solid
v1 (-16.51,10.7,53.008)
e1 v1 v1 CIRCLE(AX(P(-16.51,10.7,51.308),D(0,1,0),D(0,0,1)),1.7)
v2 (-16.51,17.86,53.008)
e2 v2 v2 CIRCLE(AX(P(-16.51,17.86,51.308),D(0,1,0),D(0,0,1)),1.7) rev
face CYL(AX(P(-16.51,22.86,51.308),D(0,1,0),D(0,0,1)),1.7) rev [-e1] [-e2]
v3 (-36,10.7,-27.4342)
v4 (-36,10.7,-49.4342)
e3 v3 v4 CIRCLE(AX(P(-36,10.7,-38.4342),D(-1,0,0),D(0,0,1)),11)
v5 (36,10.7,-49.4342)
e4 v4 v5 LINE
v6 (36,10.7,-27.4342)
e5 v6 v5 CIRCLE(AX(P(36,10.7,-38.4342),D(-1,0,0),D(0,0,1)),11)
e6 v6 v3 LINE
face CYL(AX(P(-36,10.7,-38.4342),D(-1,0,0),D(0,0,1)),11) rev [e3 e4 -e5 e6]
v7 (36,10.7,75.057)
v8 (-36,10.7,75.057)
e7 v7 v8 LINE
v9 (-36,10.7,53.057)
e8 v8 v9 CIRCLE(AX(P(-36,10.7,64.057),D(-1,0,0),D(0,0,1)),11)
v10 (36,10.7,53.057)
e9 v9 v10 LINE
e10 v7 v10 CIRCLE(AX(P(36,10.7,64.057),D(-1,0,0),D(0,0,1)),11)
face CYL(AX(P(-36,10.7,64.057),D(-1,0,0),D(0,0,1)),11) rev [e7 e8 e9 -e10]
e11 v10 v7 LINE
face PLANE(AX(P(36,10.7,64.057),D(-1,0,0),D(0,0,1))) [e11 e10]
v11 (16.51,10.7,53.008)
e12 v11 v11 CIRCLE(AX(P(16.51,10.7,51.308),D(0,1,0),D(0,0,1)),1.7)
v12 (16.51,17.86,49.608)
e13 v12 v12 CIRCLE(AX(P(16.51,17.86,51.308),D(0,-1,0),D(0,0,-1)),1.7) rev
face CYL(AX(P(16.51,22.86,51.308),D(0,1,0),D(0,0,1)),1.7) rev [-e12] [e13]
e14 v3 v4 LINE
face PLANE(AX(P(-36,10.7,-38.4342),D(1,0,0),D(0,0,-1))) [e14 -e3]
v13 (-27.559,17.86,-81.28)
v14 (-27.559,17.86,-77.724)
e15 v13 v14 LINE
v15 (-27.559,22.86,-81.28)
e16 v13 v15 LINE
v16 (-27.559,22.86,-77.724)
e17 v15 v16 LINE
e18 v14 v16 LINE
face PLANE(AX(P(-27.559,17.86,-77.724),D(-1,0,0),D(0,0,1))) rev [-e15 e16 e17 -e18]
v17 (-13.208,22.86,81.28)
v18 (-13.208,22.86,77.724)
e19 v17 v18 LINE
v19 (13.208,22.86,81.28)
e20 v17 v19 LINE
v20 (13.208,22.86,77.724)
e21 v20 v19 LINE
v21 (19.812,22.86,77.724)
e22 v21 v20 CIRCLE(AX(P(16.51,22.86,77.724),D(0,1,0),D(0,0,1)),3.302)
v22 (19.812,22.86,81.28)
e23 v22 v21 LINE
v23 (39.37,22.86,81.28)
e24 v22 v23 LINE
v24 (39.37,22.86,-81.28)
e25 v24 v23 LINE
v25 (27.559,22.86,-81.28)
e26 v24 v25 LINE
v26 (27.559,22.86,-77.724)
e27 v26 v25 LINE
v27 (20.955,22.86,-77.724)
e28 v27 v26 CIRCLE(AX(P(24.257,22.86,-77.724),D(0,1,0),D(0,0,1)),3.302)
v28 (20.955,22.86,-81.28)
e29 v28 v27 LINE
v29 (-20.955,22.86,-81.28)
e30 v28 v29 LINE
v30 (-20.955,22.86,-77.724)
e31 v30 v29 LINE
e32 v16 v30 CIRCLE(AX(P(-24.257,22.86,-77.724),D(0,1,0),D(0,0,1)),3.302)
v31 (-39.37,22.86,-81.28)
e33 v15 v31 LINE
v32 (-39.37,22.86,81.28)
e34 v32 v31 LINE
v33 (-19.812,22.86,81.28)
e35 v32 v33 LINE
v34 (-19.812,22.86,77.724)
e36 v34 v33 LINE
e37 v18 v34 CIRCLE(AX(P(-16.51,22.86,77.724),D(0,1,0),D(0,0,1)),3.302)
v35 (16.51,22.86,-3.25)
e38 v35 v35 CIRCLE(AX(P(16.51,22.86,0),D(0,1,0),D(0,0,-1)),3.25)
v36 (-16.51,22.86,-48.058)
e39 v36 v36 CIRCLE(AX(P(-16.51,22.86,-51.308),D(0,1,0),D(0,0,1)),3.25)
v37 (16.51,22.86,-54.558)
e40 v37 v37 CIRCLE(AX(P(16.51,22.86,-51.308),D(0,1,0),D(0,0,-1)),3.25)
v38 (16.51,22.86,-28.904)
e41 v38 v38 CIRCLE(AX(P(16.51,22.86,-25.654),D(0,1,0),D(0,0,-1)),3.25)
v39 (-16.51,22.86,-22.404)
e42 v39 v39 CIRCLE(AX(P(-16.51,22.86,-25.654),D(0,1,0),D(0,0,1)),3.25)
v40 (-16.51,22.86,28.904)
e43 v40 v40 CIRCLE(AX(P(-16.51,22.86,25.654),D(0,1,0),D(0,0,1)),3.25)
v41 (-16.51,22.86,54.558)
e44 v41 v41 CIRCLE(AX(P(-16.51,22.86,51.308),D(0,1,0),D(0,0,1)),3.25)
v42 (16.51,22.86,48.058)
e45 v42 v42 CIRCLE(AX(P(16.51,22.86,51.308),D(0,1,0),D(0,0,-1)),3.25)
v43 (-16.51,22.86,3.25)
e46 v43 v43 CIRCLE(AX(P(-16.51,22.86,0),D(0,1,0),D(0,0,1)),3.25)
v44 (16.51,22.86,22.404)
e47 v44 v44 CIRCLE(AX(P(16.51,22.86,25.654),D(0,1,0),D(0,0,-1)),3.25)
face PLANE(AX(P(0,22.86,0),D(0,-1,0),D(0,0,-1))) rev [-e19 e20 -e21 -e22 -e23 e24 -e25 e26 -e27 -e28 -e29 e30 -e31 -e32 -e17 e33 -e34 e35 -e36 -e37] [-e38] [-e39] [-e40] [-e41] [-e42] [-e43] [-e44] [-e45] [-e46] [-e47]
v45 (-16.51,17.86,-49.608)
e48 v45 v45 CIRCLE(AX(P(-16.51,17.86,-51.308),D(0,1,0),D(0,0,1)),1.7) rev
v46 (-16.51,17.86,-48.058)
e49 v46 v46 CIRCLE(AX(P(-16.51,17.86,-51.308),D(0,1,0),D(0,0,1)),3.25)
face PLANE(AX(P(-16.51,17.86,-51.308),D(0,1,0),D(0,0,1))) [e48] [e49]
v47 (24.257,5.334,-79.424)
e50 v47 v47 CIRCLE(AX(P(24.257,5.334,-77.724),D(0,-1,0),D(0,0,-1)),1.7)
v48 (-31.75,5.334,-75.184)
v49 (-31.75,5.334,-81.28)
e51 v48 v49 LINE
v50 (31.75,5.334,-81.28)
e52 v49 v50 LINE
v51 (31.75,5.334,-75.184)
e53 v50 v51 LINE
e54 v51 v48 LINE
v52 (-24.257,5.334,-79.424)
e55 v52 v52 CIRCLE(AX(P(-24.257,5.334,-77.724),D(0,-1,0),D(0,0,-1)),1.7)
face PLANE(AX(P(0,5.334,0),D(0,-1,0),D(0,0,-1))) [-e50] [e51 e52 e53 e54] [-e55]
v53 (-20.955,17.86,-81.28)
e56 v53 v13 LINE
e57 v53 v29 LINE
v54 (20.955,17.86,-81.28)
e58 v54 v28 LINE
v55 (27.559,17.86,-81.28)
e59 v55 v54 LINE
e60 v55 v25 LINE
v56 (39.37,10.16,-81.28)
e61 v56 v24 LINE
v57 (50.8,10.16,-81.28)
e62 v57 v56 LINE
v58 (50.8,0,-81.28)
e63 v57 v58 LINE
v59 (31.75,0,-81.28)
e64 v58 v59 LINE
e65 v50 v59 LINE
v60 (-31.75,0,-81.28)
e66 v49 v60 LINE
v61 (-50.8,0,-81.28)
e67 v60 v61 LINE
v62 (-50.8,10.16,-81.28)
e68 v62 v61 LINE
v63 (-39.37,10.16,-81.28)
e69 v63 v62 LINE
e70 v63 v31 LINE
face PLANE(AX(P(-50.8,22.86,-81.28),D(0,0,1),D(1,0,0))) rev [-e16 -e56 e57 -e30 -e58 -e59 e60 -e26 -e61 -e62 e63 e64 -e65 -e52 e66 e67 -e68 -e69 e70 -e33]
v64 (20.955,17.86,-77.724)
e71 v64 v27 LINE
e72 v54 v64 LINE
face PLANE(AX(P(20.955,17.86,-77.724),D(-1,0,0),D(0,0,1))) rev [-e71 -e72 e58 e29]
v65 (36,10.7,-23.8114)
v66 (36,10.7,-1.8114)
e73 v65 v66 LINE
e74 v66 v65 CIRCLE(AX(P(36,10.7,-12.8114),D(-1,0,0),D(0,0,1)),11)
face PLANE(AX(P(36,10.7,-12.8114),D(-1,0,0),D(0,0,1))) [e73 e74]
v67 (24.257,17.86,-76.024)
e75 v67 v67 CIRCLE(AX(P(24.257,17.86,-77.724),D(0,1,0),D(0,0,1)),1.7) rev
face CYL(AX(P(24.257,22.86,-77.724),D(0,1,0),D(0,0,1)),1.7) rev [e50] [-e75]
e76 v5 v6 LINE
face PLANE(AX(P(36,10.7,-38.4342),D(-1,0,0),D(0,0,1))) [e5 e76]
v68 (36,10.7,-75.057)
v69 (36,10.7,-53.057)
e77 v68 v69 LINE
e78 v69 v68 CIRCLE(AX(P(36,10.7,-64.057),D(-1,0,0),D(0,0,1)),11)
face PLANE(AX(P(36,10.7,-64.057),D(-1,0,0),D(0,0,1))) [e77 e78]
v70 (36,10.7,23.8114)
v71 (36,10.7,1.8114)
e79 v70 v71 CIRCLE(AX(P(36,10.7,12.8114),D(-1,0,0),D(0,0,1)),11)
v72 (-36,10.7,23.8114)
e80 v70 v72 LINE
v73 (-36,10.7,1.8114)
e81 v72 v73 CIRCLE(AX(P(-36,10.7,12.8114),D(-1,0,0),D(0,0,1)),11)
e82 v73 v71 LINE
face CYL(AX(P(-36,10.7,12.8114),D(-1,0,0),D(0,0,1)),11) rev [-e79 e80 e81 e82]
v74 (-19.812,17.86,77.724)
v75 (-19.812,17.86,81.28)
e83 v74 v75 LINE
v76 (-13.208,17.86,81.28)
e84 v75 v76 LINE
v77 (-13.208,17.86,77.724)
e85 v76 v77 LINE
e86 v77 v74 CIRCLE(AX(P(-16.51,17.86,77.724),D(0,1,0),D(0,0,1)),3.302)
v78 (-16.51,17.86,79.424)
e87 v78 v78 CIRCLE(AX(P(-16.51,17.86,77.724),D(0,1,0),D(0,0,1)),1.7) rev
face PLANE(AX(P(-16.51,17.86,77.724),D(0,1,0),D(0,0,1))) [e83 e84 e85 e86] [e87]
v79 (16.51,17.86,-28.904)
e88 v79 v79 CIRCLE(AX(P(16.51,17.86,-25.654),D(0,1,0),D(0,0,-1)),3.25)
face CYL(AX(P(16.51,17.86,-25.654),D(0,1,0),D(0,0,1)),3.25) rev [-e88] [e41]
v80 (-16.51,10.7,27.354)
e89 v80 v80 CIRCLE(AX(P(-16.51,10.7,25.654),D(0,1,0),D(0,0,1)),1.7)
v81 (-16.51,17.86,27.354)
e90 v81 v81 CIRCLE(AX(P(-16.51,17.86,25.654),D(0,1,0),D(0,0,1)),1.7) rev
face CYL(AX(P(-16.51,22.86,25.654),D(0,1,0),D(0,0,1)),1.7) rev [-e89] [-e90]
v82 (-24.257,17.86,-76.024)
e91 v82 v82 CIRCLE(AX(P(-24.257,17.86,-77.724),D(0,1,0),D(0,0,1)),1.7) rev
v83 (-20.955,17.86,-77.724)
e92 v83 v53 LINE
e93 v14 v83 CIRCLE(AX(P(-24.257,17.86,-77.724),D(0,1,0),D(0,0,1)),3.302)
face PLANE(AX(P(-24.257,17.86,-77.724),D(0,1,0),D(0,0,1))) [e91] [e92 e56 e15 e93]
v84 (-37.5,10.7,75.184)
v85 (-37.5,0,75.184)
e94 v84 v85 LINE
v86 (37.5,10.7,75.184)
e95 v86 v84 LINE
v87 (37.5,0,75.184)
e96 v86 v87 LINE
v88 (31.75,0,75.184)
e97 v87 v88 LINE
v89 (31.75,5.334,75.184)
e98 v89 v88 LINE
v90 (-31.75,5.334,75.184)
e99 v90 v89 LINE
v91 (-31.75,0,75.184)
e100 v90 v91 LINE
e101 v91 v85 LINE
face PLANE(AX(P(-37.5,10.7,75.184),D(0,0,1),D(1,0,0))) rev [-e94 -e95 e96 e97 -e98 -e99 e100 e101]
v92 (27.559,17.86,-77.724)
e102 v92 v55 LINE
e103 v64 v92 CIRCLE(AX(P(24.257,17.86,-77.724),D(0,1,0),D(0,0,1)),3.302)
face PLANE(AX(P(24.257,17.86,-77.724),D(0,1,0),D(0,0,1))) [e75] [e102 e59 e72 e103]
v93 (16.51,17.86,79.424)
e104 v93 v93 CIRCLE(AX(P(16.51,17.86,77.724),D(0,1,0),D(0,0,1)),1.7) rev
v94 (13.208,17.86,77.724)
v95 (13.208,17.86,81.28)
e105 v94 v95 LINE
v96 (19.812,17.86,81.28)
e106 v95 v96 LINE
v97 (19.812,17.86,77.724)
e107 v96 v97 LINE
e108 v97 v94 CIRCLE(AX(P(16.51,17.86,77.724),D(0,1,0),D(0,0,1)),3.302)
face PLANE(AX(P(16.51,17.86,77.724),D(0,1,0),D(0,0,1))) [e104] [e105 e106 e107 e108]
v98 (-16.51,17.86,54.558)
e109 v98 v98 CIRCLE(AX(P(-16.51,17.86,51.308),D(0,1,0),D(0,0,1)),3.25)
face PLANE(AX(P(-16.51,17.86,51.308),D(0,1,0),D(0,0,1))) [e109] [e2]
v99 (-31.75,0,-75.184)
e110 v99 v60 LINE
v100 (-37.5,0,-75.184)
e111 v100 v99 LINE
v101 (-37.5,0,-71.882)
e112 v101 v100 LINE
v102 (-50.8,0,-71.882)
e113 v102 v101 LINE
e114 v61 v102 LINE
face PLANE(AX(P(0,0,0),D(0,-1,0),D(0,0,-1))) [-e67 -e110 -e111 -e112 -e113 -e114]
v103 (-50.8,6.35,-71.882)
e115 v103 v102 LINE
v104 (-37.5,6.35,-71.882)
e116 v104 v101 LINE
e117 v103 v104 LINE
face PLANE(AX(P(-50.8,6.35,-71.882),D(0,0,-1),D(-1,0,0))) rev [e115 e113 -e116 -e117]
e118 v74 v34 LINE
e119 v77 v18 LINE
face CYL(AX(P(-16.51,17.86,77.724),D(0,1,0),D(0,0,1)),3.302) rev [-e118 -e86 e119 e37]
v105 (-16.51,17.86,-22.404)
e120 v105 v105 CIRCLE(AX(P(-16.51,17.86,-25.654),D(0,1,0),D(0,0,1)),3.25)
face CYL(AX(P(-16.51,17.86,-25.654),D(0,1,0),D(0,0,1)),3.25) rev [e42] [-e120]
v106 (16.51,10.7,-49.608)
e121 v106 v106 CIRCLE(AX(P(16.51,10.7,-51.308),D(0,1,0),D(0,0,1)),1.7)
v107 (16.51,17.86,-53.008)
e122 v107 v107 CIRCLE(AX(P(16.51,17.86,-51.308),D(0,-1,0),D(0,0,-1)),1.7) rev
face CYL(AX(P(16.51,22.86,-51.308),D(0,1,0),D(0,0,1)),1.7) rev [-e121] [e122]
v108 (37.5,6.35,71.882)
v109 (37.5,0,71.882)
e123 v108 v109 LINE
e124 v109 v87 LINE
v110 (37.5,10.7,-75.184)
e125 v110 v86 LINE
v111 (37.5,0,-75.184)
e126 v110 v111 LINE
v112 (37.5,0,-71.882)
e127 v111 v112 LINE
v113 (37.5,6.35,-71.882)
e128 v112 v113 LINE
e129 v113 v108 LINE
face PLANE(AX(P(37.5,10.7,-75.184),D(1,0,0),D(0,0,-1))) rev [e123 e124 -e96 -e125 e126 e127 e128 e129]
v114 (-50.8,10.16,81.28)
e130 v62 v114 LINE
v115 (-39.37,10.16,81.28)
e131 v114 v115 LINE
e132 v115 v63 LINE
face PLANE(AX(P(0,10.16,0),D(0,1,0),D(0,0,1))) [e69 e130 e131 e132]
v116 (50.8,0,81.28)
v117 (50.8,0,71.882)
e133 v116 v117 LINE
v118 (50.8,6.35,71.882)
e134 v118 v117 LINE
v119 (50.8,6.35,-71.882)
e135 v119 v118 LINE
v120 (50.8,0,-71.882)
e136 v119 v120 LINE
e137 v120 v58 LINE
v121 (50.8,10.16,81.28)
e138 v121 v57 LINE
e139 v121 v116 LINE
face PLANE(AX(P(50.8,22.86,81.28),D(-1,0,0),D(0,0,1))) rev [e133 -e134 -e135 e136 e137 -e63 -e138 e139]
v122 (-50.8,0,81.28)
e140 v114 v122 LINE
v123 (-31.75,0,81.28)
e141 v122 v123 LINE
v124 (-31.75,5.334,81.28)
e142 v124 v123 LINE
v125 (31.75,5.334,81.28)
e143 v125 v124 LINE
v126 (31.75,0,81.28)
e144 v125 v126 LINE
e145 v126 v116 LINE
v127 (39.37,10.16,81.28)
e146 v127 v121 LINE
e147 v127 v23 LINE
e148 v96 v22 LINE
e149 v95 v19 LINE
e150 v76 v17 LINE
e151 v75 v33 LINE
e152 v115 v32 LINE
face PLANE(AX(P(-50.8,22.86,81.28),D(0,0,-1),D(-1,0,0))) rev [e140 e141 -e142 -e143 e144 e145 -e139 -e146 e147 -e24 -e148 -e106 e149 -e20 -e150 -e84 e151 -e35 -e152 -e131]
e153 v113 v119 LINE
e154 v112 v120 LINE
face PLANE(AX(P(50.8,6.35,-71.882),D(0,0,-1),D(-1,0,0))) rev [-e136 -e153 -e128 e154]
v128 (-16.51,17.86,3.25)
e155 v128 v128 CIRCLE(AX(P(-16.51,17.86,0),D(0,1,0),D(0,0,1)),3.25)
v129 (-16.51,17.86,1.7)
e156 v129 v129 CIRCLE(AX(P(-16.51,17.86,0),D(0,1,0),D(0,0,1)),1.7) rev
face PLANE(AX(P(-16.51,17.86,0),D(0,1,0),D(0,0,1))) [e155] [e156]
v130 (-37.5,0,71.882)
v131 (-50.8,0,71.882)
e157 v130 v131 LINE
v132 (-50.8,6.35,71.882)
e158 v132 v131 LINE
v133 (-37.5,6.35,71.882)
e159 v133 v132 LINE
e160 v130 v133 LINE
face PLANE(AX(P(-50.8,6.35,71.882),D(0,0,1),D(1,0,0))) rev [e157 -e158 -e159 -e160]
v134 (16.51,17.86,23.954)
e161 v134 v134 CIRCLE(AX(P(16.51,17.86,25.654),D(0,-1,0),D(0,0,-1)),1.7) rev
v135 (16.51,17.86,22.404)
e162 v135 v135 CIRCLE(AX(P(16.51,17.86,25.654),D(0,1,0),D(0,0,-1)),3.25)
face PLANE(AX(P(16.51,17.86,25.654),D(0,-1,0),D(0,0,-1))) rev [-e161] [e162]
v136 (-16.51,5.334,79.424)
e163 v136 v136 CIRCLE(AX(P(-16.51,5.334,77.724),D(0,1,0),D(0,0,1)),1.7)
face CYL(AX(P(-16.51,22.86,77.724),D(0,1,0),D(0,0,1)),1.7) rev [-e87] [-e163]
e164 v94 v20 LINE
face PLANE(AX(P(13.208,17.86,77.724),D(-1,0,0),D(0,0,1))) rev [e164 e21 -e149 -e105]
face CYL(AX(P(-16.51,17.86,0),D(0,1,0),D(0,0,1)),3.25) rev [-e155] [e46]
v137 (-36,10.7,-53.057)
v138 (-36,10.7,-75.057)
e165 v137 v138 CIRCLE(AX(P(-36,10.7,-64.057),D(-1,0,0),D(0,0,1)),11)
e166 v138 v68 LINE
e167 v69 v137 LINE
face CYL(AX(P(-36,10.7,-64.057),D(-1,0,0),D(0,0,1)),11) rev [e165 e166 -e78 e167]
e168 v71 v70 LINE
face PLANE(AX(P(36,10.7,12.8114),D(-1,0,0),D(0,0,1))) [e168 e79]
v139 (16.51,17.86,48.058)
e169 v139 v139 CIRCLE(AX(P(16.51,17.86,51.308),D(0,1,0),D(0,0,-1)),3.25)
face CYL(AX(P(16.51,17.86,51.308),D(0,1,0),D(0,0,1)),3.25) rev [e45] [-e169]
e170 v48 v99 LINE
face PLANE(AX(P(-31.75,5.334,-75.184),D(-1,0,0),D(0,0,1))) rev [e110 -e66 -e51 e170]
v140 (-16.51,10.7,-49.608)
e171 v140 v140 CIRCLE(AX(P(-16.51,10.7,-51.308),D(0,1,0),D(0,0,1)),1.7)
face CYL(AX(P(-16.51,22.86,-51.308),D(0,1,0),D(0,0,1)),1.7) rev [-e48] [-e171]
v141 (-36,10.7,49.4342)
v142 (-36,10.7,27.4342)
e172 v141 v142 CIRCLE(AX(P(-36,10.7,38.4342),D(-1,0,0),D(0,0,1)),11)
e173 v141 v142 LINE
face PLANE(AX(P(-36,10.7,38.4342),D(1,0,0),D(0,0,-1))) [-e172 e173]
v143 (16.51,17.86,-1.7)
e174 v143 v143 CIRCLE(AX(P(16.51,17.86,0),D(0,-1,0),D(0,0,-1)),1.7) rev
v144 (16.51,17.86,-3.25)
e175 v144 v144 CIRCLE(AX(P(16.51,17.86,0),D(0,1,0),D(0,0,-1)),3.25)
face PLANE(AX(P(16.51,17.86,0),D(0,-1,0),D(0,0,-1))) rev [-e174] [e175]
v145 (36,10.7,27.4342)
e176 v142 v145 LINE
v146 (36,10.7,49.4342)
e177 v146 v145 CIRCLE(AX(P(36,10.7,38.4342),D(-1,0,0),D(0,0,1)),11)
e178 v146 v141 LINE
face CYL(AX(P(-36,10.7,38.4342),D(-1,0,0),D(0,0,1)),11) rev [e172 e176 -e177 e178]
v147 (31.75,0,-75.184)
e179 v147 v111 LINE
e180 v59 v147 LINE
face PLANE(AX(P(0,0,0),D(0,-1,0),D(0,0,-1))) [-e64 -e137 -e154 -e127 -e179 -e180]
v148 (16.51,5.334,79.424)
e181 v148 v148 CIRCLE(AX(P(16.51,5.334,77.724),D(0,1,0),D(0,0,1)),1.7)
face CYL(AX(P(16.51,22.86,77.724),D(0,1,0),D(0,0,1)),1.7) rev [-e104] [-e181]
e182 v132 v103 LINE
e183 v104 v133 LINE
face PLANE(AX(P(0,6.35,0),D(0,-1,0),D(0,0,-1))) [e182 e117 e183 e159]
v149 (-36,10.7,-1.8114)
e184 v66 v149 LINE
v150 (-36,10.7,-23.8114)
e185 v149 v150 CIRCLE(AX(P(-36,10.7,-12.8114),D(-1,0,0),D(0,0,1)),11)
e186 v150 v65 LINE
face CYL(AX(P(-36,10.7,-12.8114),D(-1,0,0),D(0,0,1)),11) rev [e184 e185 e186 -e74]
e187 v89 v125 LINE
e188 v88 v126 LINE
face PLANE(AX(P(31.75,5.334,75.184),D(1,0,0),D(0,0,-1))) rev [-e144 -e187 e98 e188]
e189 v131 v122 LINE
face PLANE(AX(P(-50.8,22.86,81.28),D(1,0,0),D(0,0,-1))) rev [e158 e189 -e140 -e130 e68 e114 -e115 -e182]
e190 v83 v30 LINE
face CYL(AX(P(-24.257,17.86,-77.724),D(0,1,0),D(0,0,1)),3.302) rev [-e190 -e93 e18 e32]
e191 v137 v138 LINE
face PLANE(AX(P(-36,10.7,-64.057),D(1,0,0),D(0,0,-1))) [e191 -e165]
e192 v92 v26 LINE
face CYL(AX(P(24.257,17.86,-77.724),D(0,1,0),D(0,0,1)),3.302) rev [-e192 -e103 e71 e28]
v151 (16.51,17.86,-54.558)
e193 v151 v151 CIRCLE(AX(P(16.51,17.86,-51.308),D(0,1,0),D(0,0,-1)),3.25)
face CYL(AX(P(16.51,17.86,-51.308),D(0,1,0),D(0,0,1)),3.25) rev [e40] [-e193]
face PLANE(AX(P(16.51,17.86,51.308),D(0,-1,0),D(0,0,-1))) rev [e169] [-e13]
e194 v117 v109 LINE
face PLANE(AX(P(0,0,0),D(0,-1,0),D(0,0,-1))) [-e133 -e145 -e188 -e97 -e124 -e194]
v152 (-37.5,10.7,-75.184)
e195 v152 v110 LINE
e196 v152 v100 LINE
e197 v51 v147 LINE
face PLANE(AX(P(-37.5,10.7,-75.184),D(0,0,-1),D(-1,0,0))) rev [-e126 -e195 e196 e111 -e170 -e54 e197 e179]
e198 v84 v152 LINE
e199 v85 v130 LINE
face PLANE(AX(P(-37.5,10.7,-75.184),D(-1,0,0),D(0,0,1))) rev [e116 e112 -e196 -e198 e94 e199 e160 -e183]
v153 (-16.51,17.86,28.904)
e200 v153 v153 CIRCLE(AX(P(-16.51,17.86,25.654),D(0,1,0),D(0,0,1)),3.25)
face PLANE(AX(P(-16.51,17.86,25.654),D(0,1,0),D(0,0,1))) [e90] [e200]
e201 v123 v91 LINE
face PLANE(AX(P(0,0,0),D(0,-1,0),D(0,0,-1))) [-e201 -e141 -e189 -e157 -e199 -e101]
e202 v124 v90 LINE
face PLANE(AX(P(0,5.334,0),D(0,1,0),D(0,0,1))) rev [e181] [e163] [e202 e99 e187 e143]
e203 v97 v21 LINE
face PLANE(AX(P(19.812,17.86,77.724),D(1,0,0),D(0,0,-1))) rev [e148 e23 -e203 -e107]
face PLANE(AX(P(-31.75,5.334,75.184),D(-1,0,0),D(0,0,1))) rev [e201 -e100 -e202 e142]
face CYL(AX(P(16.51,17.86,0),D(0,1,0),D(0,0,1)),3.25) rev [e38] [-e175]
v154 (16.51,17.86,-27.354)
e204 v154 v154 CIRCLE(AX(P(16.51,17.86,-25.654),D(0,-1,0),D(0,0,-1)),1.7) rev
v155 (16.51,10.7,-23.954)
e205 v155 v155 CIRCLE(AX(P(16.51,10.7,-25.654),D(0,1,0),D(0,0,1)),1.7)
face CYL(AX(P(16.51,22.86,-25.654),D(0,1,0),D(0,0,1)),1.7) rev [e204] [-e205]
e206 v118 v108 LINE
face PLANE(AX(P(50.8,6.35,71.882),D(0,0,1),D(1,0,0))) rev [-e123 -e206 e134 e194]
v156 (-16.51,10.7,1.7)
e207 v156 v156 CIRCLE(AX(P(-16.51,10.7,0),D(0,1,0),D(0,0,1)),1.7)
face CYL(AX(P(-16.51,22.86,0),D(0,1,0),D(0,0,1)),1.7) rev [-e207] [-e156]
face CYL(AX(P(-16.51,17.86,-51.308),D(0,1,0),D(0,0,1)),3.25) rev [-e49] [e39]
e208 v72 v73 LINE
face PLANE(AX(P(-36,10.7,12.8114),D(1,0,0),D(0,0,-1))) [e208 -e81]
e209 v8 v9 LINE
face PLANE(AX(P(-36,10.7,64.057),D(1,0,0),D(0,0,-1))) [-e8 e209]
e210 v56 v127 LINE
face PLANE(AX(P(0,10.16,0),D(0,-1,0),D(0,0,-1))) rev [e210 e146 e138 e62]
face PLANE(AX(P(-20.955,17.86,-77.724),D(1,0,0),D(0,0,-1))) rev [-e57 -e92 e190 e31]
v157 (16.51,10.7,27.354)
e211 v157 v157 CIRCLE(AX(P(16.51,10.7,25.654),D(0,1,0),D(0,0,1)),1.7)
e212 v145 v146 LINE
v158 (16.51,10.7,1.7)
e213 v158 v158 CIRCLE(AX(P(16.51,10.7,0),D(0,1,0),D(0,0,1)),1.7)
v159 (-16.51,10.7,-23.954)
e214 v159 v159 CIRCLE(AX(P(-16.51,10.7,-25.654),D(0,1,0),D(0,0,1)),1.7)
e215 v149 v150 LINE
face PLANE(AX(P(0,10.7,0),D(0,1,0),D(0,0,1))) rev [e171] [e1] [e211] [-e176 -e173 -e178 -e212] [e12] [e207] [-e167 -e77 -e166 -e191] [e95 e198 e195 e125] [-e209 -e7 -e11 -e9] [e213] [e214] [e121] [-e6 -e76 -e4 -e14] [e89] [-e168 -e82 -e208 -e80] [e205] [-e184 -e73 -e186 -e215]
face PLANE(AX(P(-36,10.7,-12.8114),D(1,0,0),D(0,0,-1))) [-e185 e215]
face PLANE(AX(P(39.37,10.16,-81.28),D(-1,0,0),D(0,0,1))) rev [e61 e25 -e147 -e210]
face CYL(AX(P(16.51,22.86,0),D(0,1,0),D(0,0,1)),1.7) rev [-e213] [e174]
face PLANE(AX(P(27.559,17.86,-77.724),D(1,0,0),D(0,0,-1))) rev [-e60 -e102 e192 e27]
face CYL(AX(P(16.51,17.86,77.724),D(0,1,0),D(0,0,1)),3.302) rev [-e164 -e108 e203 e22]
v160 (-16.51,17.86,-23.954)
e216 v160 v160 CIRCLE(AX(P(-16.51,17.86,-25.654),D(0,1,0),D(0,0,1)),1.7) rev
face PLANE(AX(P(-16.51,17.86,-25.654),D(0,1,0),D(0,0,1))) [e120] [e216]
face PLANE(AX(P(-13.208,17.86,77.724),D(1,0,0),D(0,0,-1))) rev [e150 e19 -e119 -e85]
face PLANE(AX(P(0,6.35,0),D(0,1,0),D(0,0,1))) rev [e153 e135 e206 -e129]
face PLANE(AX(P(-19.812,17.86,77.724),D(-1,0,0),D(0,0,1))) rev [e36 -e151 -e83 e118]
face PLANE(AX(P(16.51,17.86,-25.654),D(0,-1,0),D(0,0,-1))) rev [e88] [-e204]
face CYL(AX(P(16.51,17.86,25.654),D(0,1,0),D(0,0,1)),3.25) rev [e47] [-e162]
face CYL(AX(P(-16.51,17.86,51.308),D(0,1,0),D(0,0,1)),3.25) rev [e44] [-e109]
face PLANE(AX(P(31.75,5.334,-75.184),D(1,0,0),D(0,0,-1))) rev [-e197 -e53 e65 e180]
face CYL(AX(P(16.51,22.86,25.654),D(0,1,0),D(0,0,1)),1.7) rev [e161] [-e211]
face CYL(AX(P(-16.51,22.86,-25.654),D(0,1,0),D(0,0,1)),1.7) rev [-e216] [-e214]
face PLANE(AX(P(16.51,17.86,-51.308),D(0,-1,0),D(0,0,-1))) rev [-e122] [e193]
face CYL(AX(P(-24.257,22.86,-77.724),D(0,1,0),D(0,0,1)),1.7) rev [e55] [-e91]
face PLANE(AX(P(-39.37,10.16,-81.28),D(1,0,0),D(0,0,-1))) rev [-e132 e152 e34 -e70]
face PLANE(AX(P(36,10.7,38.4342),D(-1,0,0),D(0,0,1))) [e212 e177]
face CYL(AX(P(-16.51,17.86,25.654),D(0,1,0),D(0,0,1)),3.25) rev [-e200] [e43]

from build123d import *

# Parameters (mm, degrees)
SKETCH1_W                    = 101.6
SKETCH1_H                    = 162.56
BOSS_EXTRUDE1_DEPTH          = 22.86
SKETCH2_W                    = 75
SKETCH2_H                    = 150.368
CUT_EXTRUDE1_DEPTH           = 10.7
SKETCH3_W                    = 72
SKETCH3_H                    = 11.000000098
LPATTERN1_COUNT              = 6
LPATTERN1_PITCH              = 25.622799961
M3_CLEARANCE_HOLE1_D         = 3.4
SKETCH10_R                   = 3.249999977
CUT_EXTRUDE2_DEPTH           = 5
SKETCH11_W                   = 11.43
SKETCH11_H                   = 162.56
CUT_EXTRUDE3_DEPTH           = 12.7
SKETCH12_W                   = 15.748
SKETCH12_H                   = 143.764
CUT_EXTRUDE4_DEPTH           = 6.35
SKETCH17_W                   = 63.5
SKETCH17_H                   = 6.096
CUT_EXTRUDE6_DEPTH           = 5.334
M3_START                     = 5.334
M3_CLEARANCE_HOLE2_OUTLINE_R = 1.7
M3_CLEARANCE_HOLE2_DEPTH     = 17.526
CUT_EXTRUDE8_DEPTH           = 5


# Read off the part's stored shape, not the designer's step: M3 Clearance Hole2
with BuildPart() as part:
    # Sketch1 → Boss-Extrude1 (new body)
    with BuildSketch(Plane(origin=(0, 0, 0), x_dir=(1, 0, 0), z_dir=(0, 1, 0))):
        Rectangle(SKETCH1_W, SKETCH1_H)
    extrude(amount=BOSS_EXTRUDE1_DEPTH)

    # Sketch2 → Cut-Extrude1 (cut)
    with BuildSketch(Plane.XZ):
        Rectangle(SKETCH2_W, SKETCH2_H)
    extrude(amount=-CUT_EXTRUDE1_DEPTH, mode=Mode.SUBTRACT)

    # Sketch3 → Cut-Revolve3 (revolve, cut)
    with BuildSketch(Plane.XZ.offset(-10.7)):
        with Locations((0, 69.556999951)):
            Rectangle(SKETCH3_W, SKETCH3_H)
    cut_revolve3 = revolve(axis=Axis((-36, 10.7, 64.056999902), (1, 0, 0)), mode=Mode.SUBTRACT)

    # LPattern1: Cut-Revolve3 ×6
    with Locations(*[(0, 0, -i * LPATTERN1_PITCH) for i in range(1, LPATTERN1_COUNT)]):
        add(cut_revolve3, mode=Mode.SUBTRACT)

    # M3 Clearance Hole1 (through all)
    with Locations(Plane(origin=(0, 22.86, 0), x_dir=(1, 0, 0), z_dir=(0, 1, 0))):
        with Locations((-16.51, 51.308), (-16.51, 25.654), (-16.51, 0), (-16.51, -25.654), (-16.51, -51.308), (16.51, -51.308), (16.51, -25.654), (16.51, 0), (16.51, 25.654), (16.51, 51.308)):
            Hole(M3_CLEARANCE_HOLE1_D / 2)

    # Sketch10 → Cut-Extrude2 (cut)
    with BuildSketch(Plane(origin=(0, 22.86, 0), x_dir=(1, 0, 0), z_dir=(0, 1, 0))):
        with Locations(Location((-16.51, 51.308, 0), (0, 0, 270))):
            Circle(SKETCH10_R)
        with Locations(Location((-16.51, 25.654, 0), (0, 0, 270))):
            Circle(SKETCH10_R)
        with Locations(Location((-16.51, 0, 0), (0, 0, 270))):
            Circle(SKETCH10_R)
        with Locations(Location((-16.51, -25.654, 0), (0, 0, 270))):
            Circle(SKETCH10_R)
        with Locations(Location((-16.51, -51.308, 0), (0, 0, 270))):
            Circle(SKETCH10_R)
        with Locations(Location((16.51, -51.308, 0), (0, 0, 90))):
            Circle(SKETCH10_R)
        with Locations(Location((16.51, -25.654, 0), (0, 0, 90))):
            Circle(SKETCH10_R)
        with Locations(Location((16.51, 0, 0), (0, 0, 90))):
            Circle(SKETCH10_R)
        with Locations(Location((16.51, 25.654, 0), (0, 0, 90))):
            Circle(SKETCH10_R)
        with Locations(Location((16.51, 51.308, 0), (0, 0, 90))):
            Circle(SKETCH10_R)
    extrude(amount=-CUT_EXTRUDE2_DEPTH, mode=Mode.SUBTRACT)

    # Sketch11 → Cut-Extrude3 (cut)
    with BuildSketch(Plane(origin=(0, 22.86, 0), x_dir=(1, 0, 0), z_dir=(0, 1, 0))):
        with Locations((-45.085, 0)):
            Rectangle(SKETCH11_W, SKETCH11_H)
        with Locations((45.085, 0)):
            Rectangle(SKETCH11_W, SKETCH11_H)
    extrude(amount=-CUT_EXTRUDE3_DEPTH, mode=Mode.SUBTRACT)

    # Sketch12 → Cut-Extrude4 (cut)
    with BuildSketch(Plane.XZ):
        with Locations((-42.926, 0)):
            Rectangle(SKETCH12_W, SKETCH12_H)
        with Locations((42.926, 0)):
            Rectangle(SKETCH12_W, SKETCH12_H)
    extrude(amount=-CUT_EXTRUDE4_DEPTH, mode=Mode.SUBTRACT)

    # Sketch17 → Cut-Extrude6 (cut)
    with BuildSketch(Plane.XZ):
        with Locations((0, -78.232)):
            Rectangle(SKETCH17_W, SKETCH17_H)
        with Locations((0, 78.232)):
            Rectangle(SKETCH17_W, SKETCH17_H)
    extrude(amount=-CUT_EXTRUDE6_DEPTH, mode=Mode.SUBTRACT)

    # M3 Clearance Hole2 outline → M3 Clearance Hole2 (cut)
    with BuildSketch(Plane(origin=(0, 0, 0), x_dir=(1, 0, 0), z_dir=(0, 1, 0)).offset(M3_START)):
        with Locations((16.51, -77.724)):
            Circle(M3_CLEARANCE_HOLE2_OUTLINE_R)
        with Locations((-16.51, -77.724)):
            Circle(M3_CLEARANCE_HOLE2_OUTLINE_R)
        with Locations((24.257, 77.724)):
            Circle(M3_CLEARANCE_HOLE2_OUTLINE_R)
        with Locations((-24.257, 77.724)):
            Circle(M3_CLEARANCE_HOLE2_OUTLINE_R)
    extrude(amount=M3_CLEARANCE_HOLE2_DEPTH, mode=Mode.SUBTRACT)

    # Sketch21 → Cut-Extrude8 (cut)
    with BuildSketch(Plane(origin=(0, 22.86, 0), x_dir=(1, 0, 0), z_dir=(0, 1, 0))):
        with BuildLine():
            Line((-27.559, 77.724), (-27.559, 81.28))
            Line((-27.559, 81.28), (-20.955, 81.28))
            Line((-20.955, 81.28), (-20.955, 77.724))
            ThreePointArc((-20.955, 77.724), (-24.257, 74.422), (-27.559, 77.724))
        make_face()
        with BuildLine():
            Line((20.955, 77.724), (20.955, 81.28))
            Line((20.955, 81.28), (27.559, 81.28))
            Line((27.559, 81.28), (27.559, 77.724))
            ThreePointArc((27.559, 77.724), (24.257, 74.422), (20.955, 77.724))
        make_face()
        with BuildLine():
            Line((-19.812, -77.724), (-19.812, -81.28))
            Line((-19.812, -81.28), (-13.208, -81.28))
            Line((-13.208, -81.28), (-13.208, -77.724))
            ThreePointArc((-13.208, -77.724), (-16.51, -74.422), (-19.812, -77.724))
        make_face()
        with BuildLine():
            Line((13.208, -77.724), (13.208, -81.28))
            Line((13.208, -81.28), (19.812, -81.28))
            Line((19.812, -81.28), (19.812, -77.724))
            ThreePointArc((19.812, -77.724), (16.51, -74.422), (13.208, -77.724))
        make_face()
    extrude(amount=-CUT_EXTRUDE8_DEPTH, mode=Mode.SUBTRACT)


solid = part.part
